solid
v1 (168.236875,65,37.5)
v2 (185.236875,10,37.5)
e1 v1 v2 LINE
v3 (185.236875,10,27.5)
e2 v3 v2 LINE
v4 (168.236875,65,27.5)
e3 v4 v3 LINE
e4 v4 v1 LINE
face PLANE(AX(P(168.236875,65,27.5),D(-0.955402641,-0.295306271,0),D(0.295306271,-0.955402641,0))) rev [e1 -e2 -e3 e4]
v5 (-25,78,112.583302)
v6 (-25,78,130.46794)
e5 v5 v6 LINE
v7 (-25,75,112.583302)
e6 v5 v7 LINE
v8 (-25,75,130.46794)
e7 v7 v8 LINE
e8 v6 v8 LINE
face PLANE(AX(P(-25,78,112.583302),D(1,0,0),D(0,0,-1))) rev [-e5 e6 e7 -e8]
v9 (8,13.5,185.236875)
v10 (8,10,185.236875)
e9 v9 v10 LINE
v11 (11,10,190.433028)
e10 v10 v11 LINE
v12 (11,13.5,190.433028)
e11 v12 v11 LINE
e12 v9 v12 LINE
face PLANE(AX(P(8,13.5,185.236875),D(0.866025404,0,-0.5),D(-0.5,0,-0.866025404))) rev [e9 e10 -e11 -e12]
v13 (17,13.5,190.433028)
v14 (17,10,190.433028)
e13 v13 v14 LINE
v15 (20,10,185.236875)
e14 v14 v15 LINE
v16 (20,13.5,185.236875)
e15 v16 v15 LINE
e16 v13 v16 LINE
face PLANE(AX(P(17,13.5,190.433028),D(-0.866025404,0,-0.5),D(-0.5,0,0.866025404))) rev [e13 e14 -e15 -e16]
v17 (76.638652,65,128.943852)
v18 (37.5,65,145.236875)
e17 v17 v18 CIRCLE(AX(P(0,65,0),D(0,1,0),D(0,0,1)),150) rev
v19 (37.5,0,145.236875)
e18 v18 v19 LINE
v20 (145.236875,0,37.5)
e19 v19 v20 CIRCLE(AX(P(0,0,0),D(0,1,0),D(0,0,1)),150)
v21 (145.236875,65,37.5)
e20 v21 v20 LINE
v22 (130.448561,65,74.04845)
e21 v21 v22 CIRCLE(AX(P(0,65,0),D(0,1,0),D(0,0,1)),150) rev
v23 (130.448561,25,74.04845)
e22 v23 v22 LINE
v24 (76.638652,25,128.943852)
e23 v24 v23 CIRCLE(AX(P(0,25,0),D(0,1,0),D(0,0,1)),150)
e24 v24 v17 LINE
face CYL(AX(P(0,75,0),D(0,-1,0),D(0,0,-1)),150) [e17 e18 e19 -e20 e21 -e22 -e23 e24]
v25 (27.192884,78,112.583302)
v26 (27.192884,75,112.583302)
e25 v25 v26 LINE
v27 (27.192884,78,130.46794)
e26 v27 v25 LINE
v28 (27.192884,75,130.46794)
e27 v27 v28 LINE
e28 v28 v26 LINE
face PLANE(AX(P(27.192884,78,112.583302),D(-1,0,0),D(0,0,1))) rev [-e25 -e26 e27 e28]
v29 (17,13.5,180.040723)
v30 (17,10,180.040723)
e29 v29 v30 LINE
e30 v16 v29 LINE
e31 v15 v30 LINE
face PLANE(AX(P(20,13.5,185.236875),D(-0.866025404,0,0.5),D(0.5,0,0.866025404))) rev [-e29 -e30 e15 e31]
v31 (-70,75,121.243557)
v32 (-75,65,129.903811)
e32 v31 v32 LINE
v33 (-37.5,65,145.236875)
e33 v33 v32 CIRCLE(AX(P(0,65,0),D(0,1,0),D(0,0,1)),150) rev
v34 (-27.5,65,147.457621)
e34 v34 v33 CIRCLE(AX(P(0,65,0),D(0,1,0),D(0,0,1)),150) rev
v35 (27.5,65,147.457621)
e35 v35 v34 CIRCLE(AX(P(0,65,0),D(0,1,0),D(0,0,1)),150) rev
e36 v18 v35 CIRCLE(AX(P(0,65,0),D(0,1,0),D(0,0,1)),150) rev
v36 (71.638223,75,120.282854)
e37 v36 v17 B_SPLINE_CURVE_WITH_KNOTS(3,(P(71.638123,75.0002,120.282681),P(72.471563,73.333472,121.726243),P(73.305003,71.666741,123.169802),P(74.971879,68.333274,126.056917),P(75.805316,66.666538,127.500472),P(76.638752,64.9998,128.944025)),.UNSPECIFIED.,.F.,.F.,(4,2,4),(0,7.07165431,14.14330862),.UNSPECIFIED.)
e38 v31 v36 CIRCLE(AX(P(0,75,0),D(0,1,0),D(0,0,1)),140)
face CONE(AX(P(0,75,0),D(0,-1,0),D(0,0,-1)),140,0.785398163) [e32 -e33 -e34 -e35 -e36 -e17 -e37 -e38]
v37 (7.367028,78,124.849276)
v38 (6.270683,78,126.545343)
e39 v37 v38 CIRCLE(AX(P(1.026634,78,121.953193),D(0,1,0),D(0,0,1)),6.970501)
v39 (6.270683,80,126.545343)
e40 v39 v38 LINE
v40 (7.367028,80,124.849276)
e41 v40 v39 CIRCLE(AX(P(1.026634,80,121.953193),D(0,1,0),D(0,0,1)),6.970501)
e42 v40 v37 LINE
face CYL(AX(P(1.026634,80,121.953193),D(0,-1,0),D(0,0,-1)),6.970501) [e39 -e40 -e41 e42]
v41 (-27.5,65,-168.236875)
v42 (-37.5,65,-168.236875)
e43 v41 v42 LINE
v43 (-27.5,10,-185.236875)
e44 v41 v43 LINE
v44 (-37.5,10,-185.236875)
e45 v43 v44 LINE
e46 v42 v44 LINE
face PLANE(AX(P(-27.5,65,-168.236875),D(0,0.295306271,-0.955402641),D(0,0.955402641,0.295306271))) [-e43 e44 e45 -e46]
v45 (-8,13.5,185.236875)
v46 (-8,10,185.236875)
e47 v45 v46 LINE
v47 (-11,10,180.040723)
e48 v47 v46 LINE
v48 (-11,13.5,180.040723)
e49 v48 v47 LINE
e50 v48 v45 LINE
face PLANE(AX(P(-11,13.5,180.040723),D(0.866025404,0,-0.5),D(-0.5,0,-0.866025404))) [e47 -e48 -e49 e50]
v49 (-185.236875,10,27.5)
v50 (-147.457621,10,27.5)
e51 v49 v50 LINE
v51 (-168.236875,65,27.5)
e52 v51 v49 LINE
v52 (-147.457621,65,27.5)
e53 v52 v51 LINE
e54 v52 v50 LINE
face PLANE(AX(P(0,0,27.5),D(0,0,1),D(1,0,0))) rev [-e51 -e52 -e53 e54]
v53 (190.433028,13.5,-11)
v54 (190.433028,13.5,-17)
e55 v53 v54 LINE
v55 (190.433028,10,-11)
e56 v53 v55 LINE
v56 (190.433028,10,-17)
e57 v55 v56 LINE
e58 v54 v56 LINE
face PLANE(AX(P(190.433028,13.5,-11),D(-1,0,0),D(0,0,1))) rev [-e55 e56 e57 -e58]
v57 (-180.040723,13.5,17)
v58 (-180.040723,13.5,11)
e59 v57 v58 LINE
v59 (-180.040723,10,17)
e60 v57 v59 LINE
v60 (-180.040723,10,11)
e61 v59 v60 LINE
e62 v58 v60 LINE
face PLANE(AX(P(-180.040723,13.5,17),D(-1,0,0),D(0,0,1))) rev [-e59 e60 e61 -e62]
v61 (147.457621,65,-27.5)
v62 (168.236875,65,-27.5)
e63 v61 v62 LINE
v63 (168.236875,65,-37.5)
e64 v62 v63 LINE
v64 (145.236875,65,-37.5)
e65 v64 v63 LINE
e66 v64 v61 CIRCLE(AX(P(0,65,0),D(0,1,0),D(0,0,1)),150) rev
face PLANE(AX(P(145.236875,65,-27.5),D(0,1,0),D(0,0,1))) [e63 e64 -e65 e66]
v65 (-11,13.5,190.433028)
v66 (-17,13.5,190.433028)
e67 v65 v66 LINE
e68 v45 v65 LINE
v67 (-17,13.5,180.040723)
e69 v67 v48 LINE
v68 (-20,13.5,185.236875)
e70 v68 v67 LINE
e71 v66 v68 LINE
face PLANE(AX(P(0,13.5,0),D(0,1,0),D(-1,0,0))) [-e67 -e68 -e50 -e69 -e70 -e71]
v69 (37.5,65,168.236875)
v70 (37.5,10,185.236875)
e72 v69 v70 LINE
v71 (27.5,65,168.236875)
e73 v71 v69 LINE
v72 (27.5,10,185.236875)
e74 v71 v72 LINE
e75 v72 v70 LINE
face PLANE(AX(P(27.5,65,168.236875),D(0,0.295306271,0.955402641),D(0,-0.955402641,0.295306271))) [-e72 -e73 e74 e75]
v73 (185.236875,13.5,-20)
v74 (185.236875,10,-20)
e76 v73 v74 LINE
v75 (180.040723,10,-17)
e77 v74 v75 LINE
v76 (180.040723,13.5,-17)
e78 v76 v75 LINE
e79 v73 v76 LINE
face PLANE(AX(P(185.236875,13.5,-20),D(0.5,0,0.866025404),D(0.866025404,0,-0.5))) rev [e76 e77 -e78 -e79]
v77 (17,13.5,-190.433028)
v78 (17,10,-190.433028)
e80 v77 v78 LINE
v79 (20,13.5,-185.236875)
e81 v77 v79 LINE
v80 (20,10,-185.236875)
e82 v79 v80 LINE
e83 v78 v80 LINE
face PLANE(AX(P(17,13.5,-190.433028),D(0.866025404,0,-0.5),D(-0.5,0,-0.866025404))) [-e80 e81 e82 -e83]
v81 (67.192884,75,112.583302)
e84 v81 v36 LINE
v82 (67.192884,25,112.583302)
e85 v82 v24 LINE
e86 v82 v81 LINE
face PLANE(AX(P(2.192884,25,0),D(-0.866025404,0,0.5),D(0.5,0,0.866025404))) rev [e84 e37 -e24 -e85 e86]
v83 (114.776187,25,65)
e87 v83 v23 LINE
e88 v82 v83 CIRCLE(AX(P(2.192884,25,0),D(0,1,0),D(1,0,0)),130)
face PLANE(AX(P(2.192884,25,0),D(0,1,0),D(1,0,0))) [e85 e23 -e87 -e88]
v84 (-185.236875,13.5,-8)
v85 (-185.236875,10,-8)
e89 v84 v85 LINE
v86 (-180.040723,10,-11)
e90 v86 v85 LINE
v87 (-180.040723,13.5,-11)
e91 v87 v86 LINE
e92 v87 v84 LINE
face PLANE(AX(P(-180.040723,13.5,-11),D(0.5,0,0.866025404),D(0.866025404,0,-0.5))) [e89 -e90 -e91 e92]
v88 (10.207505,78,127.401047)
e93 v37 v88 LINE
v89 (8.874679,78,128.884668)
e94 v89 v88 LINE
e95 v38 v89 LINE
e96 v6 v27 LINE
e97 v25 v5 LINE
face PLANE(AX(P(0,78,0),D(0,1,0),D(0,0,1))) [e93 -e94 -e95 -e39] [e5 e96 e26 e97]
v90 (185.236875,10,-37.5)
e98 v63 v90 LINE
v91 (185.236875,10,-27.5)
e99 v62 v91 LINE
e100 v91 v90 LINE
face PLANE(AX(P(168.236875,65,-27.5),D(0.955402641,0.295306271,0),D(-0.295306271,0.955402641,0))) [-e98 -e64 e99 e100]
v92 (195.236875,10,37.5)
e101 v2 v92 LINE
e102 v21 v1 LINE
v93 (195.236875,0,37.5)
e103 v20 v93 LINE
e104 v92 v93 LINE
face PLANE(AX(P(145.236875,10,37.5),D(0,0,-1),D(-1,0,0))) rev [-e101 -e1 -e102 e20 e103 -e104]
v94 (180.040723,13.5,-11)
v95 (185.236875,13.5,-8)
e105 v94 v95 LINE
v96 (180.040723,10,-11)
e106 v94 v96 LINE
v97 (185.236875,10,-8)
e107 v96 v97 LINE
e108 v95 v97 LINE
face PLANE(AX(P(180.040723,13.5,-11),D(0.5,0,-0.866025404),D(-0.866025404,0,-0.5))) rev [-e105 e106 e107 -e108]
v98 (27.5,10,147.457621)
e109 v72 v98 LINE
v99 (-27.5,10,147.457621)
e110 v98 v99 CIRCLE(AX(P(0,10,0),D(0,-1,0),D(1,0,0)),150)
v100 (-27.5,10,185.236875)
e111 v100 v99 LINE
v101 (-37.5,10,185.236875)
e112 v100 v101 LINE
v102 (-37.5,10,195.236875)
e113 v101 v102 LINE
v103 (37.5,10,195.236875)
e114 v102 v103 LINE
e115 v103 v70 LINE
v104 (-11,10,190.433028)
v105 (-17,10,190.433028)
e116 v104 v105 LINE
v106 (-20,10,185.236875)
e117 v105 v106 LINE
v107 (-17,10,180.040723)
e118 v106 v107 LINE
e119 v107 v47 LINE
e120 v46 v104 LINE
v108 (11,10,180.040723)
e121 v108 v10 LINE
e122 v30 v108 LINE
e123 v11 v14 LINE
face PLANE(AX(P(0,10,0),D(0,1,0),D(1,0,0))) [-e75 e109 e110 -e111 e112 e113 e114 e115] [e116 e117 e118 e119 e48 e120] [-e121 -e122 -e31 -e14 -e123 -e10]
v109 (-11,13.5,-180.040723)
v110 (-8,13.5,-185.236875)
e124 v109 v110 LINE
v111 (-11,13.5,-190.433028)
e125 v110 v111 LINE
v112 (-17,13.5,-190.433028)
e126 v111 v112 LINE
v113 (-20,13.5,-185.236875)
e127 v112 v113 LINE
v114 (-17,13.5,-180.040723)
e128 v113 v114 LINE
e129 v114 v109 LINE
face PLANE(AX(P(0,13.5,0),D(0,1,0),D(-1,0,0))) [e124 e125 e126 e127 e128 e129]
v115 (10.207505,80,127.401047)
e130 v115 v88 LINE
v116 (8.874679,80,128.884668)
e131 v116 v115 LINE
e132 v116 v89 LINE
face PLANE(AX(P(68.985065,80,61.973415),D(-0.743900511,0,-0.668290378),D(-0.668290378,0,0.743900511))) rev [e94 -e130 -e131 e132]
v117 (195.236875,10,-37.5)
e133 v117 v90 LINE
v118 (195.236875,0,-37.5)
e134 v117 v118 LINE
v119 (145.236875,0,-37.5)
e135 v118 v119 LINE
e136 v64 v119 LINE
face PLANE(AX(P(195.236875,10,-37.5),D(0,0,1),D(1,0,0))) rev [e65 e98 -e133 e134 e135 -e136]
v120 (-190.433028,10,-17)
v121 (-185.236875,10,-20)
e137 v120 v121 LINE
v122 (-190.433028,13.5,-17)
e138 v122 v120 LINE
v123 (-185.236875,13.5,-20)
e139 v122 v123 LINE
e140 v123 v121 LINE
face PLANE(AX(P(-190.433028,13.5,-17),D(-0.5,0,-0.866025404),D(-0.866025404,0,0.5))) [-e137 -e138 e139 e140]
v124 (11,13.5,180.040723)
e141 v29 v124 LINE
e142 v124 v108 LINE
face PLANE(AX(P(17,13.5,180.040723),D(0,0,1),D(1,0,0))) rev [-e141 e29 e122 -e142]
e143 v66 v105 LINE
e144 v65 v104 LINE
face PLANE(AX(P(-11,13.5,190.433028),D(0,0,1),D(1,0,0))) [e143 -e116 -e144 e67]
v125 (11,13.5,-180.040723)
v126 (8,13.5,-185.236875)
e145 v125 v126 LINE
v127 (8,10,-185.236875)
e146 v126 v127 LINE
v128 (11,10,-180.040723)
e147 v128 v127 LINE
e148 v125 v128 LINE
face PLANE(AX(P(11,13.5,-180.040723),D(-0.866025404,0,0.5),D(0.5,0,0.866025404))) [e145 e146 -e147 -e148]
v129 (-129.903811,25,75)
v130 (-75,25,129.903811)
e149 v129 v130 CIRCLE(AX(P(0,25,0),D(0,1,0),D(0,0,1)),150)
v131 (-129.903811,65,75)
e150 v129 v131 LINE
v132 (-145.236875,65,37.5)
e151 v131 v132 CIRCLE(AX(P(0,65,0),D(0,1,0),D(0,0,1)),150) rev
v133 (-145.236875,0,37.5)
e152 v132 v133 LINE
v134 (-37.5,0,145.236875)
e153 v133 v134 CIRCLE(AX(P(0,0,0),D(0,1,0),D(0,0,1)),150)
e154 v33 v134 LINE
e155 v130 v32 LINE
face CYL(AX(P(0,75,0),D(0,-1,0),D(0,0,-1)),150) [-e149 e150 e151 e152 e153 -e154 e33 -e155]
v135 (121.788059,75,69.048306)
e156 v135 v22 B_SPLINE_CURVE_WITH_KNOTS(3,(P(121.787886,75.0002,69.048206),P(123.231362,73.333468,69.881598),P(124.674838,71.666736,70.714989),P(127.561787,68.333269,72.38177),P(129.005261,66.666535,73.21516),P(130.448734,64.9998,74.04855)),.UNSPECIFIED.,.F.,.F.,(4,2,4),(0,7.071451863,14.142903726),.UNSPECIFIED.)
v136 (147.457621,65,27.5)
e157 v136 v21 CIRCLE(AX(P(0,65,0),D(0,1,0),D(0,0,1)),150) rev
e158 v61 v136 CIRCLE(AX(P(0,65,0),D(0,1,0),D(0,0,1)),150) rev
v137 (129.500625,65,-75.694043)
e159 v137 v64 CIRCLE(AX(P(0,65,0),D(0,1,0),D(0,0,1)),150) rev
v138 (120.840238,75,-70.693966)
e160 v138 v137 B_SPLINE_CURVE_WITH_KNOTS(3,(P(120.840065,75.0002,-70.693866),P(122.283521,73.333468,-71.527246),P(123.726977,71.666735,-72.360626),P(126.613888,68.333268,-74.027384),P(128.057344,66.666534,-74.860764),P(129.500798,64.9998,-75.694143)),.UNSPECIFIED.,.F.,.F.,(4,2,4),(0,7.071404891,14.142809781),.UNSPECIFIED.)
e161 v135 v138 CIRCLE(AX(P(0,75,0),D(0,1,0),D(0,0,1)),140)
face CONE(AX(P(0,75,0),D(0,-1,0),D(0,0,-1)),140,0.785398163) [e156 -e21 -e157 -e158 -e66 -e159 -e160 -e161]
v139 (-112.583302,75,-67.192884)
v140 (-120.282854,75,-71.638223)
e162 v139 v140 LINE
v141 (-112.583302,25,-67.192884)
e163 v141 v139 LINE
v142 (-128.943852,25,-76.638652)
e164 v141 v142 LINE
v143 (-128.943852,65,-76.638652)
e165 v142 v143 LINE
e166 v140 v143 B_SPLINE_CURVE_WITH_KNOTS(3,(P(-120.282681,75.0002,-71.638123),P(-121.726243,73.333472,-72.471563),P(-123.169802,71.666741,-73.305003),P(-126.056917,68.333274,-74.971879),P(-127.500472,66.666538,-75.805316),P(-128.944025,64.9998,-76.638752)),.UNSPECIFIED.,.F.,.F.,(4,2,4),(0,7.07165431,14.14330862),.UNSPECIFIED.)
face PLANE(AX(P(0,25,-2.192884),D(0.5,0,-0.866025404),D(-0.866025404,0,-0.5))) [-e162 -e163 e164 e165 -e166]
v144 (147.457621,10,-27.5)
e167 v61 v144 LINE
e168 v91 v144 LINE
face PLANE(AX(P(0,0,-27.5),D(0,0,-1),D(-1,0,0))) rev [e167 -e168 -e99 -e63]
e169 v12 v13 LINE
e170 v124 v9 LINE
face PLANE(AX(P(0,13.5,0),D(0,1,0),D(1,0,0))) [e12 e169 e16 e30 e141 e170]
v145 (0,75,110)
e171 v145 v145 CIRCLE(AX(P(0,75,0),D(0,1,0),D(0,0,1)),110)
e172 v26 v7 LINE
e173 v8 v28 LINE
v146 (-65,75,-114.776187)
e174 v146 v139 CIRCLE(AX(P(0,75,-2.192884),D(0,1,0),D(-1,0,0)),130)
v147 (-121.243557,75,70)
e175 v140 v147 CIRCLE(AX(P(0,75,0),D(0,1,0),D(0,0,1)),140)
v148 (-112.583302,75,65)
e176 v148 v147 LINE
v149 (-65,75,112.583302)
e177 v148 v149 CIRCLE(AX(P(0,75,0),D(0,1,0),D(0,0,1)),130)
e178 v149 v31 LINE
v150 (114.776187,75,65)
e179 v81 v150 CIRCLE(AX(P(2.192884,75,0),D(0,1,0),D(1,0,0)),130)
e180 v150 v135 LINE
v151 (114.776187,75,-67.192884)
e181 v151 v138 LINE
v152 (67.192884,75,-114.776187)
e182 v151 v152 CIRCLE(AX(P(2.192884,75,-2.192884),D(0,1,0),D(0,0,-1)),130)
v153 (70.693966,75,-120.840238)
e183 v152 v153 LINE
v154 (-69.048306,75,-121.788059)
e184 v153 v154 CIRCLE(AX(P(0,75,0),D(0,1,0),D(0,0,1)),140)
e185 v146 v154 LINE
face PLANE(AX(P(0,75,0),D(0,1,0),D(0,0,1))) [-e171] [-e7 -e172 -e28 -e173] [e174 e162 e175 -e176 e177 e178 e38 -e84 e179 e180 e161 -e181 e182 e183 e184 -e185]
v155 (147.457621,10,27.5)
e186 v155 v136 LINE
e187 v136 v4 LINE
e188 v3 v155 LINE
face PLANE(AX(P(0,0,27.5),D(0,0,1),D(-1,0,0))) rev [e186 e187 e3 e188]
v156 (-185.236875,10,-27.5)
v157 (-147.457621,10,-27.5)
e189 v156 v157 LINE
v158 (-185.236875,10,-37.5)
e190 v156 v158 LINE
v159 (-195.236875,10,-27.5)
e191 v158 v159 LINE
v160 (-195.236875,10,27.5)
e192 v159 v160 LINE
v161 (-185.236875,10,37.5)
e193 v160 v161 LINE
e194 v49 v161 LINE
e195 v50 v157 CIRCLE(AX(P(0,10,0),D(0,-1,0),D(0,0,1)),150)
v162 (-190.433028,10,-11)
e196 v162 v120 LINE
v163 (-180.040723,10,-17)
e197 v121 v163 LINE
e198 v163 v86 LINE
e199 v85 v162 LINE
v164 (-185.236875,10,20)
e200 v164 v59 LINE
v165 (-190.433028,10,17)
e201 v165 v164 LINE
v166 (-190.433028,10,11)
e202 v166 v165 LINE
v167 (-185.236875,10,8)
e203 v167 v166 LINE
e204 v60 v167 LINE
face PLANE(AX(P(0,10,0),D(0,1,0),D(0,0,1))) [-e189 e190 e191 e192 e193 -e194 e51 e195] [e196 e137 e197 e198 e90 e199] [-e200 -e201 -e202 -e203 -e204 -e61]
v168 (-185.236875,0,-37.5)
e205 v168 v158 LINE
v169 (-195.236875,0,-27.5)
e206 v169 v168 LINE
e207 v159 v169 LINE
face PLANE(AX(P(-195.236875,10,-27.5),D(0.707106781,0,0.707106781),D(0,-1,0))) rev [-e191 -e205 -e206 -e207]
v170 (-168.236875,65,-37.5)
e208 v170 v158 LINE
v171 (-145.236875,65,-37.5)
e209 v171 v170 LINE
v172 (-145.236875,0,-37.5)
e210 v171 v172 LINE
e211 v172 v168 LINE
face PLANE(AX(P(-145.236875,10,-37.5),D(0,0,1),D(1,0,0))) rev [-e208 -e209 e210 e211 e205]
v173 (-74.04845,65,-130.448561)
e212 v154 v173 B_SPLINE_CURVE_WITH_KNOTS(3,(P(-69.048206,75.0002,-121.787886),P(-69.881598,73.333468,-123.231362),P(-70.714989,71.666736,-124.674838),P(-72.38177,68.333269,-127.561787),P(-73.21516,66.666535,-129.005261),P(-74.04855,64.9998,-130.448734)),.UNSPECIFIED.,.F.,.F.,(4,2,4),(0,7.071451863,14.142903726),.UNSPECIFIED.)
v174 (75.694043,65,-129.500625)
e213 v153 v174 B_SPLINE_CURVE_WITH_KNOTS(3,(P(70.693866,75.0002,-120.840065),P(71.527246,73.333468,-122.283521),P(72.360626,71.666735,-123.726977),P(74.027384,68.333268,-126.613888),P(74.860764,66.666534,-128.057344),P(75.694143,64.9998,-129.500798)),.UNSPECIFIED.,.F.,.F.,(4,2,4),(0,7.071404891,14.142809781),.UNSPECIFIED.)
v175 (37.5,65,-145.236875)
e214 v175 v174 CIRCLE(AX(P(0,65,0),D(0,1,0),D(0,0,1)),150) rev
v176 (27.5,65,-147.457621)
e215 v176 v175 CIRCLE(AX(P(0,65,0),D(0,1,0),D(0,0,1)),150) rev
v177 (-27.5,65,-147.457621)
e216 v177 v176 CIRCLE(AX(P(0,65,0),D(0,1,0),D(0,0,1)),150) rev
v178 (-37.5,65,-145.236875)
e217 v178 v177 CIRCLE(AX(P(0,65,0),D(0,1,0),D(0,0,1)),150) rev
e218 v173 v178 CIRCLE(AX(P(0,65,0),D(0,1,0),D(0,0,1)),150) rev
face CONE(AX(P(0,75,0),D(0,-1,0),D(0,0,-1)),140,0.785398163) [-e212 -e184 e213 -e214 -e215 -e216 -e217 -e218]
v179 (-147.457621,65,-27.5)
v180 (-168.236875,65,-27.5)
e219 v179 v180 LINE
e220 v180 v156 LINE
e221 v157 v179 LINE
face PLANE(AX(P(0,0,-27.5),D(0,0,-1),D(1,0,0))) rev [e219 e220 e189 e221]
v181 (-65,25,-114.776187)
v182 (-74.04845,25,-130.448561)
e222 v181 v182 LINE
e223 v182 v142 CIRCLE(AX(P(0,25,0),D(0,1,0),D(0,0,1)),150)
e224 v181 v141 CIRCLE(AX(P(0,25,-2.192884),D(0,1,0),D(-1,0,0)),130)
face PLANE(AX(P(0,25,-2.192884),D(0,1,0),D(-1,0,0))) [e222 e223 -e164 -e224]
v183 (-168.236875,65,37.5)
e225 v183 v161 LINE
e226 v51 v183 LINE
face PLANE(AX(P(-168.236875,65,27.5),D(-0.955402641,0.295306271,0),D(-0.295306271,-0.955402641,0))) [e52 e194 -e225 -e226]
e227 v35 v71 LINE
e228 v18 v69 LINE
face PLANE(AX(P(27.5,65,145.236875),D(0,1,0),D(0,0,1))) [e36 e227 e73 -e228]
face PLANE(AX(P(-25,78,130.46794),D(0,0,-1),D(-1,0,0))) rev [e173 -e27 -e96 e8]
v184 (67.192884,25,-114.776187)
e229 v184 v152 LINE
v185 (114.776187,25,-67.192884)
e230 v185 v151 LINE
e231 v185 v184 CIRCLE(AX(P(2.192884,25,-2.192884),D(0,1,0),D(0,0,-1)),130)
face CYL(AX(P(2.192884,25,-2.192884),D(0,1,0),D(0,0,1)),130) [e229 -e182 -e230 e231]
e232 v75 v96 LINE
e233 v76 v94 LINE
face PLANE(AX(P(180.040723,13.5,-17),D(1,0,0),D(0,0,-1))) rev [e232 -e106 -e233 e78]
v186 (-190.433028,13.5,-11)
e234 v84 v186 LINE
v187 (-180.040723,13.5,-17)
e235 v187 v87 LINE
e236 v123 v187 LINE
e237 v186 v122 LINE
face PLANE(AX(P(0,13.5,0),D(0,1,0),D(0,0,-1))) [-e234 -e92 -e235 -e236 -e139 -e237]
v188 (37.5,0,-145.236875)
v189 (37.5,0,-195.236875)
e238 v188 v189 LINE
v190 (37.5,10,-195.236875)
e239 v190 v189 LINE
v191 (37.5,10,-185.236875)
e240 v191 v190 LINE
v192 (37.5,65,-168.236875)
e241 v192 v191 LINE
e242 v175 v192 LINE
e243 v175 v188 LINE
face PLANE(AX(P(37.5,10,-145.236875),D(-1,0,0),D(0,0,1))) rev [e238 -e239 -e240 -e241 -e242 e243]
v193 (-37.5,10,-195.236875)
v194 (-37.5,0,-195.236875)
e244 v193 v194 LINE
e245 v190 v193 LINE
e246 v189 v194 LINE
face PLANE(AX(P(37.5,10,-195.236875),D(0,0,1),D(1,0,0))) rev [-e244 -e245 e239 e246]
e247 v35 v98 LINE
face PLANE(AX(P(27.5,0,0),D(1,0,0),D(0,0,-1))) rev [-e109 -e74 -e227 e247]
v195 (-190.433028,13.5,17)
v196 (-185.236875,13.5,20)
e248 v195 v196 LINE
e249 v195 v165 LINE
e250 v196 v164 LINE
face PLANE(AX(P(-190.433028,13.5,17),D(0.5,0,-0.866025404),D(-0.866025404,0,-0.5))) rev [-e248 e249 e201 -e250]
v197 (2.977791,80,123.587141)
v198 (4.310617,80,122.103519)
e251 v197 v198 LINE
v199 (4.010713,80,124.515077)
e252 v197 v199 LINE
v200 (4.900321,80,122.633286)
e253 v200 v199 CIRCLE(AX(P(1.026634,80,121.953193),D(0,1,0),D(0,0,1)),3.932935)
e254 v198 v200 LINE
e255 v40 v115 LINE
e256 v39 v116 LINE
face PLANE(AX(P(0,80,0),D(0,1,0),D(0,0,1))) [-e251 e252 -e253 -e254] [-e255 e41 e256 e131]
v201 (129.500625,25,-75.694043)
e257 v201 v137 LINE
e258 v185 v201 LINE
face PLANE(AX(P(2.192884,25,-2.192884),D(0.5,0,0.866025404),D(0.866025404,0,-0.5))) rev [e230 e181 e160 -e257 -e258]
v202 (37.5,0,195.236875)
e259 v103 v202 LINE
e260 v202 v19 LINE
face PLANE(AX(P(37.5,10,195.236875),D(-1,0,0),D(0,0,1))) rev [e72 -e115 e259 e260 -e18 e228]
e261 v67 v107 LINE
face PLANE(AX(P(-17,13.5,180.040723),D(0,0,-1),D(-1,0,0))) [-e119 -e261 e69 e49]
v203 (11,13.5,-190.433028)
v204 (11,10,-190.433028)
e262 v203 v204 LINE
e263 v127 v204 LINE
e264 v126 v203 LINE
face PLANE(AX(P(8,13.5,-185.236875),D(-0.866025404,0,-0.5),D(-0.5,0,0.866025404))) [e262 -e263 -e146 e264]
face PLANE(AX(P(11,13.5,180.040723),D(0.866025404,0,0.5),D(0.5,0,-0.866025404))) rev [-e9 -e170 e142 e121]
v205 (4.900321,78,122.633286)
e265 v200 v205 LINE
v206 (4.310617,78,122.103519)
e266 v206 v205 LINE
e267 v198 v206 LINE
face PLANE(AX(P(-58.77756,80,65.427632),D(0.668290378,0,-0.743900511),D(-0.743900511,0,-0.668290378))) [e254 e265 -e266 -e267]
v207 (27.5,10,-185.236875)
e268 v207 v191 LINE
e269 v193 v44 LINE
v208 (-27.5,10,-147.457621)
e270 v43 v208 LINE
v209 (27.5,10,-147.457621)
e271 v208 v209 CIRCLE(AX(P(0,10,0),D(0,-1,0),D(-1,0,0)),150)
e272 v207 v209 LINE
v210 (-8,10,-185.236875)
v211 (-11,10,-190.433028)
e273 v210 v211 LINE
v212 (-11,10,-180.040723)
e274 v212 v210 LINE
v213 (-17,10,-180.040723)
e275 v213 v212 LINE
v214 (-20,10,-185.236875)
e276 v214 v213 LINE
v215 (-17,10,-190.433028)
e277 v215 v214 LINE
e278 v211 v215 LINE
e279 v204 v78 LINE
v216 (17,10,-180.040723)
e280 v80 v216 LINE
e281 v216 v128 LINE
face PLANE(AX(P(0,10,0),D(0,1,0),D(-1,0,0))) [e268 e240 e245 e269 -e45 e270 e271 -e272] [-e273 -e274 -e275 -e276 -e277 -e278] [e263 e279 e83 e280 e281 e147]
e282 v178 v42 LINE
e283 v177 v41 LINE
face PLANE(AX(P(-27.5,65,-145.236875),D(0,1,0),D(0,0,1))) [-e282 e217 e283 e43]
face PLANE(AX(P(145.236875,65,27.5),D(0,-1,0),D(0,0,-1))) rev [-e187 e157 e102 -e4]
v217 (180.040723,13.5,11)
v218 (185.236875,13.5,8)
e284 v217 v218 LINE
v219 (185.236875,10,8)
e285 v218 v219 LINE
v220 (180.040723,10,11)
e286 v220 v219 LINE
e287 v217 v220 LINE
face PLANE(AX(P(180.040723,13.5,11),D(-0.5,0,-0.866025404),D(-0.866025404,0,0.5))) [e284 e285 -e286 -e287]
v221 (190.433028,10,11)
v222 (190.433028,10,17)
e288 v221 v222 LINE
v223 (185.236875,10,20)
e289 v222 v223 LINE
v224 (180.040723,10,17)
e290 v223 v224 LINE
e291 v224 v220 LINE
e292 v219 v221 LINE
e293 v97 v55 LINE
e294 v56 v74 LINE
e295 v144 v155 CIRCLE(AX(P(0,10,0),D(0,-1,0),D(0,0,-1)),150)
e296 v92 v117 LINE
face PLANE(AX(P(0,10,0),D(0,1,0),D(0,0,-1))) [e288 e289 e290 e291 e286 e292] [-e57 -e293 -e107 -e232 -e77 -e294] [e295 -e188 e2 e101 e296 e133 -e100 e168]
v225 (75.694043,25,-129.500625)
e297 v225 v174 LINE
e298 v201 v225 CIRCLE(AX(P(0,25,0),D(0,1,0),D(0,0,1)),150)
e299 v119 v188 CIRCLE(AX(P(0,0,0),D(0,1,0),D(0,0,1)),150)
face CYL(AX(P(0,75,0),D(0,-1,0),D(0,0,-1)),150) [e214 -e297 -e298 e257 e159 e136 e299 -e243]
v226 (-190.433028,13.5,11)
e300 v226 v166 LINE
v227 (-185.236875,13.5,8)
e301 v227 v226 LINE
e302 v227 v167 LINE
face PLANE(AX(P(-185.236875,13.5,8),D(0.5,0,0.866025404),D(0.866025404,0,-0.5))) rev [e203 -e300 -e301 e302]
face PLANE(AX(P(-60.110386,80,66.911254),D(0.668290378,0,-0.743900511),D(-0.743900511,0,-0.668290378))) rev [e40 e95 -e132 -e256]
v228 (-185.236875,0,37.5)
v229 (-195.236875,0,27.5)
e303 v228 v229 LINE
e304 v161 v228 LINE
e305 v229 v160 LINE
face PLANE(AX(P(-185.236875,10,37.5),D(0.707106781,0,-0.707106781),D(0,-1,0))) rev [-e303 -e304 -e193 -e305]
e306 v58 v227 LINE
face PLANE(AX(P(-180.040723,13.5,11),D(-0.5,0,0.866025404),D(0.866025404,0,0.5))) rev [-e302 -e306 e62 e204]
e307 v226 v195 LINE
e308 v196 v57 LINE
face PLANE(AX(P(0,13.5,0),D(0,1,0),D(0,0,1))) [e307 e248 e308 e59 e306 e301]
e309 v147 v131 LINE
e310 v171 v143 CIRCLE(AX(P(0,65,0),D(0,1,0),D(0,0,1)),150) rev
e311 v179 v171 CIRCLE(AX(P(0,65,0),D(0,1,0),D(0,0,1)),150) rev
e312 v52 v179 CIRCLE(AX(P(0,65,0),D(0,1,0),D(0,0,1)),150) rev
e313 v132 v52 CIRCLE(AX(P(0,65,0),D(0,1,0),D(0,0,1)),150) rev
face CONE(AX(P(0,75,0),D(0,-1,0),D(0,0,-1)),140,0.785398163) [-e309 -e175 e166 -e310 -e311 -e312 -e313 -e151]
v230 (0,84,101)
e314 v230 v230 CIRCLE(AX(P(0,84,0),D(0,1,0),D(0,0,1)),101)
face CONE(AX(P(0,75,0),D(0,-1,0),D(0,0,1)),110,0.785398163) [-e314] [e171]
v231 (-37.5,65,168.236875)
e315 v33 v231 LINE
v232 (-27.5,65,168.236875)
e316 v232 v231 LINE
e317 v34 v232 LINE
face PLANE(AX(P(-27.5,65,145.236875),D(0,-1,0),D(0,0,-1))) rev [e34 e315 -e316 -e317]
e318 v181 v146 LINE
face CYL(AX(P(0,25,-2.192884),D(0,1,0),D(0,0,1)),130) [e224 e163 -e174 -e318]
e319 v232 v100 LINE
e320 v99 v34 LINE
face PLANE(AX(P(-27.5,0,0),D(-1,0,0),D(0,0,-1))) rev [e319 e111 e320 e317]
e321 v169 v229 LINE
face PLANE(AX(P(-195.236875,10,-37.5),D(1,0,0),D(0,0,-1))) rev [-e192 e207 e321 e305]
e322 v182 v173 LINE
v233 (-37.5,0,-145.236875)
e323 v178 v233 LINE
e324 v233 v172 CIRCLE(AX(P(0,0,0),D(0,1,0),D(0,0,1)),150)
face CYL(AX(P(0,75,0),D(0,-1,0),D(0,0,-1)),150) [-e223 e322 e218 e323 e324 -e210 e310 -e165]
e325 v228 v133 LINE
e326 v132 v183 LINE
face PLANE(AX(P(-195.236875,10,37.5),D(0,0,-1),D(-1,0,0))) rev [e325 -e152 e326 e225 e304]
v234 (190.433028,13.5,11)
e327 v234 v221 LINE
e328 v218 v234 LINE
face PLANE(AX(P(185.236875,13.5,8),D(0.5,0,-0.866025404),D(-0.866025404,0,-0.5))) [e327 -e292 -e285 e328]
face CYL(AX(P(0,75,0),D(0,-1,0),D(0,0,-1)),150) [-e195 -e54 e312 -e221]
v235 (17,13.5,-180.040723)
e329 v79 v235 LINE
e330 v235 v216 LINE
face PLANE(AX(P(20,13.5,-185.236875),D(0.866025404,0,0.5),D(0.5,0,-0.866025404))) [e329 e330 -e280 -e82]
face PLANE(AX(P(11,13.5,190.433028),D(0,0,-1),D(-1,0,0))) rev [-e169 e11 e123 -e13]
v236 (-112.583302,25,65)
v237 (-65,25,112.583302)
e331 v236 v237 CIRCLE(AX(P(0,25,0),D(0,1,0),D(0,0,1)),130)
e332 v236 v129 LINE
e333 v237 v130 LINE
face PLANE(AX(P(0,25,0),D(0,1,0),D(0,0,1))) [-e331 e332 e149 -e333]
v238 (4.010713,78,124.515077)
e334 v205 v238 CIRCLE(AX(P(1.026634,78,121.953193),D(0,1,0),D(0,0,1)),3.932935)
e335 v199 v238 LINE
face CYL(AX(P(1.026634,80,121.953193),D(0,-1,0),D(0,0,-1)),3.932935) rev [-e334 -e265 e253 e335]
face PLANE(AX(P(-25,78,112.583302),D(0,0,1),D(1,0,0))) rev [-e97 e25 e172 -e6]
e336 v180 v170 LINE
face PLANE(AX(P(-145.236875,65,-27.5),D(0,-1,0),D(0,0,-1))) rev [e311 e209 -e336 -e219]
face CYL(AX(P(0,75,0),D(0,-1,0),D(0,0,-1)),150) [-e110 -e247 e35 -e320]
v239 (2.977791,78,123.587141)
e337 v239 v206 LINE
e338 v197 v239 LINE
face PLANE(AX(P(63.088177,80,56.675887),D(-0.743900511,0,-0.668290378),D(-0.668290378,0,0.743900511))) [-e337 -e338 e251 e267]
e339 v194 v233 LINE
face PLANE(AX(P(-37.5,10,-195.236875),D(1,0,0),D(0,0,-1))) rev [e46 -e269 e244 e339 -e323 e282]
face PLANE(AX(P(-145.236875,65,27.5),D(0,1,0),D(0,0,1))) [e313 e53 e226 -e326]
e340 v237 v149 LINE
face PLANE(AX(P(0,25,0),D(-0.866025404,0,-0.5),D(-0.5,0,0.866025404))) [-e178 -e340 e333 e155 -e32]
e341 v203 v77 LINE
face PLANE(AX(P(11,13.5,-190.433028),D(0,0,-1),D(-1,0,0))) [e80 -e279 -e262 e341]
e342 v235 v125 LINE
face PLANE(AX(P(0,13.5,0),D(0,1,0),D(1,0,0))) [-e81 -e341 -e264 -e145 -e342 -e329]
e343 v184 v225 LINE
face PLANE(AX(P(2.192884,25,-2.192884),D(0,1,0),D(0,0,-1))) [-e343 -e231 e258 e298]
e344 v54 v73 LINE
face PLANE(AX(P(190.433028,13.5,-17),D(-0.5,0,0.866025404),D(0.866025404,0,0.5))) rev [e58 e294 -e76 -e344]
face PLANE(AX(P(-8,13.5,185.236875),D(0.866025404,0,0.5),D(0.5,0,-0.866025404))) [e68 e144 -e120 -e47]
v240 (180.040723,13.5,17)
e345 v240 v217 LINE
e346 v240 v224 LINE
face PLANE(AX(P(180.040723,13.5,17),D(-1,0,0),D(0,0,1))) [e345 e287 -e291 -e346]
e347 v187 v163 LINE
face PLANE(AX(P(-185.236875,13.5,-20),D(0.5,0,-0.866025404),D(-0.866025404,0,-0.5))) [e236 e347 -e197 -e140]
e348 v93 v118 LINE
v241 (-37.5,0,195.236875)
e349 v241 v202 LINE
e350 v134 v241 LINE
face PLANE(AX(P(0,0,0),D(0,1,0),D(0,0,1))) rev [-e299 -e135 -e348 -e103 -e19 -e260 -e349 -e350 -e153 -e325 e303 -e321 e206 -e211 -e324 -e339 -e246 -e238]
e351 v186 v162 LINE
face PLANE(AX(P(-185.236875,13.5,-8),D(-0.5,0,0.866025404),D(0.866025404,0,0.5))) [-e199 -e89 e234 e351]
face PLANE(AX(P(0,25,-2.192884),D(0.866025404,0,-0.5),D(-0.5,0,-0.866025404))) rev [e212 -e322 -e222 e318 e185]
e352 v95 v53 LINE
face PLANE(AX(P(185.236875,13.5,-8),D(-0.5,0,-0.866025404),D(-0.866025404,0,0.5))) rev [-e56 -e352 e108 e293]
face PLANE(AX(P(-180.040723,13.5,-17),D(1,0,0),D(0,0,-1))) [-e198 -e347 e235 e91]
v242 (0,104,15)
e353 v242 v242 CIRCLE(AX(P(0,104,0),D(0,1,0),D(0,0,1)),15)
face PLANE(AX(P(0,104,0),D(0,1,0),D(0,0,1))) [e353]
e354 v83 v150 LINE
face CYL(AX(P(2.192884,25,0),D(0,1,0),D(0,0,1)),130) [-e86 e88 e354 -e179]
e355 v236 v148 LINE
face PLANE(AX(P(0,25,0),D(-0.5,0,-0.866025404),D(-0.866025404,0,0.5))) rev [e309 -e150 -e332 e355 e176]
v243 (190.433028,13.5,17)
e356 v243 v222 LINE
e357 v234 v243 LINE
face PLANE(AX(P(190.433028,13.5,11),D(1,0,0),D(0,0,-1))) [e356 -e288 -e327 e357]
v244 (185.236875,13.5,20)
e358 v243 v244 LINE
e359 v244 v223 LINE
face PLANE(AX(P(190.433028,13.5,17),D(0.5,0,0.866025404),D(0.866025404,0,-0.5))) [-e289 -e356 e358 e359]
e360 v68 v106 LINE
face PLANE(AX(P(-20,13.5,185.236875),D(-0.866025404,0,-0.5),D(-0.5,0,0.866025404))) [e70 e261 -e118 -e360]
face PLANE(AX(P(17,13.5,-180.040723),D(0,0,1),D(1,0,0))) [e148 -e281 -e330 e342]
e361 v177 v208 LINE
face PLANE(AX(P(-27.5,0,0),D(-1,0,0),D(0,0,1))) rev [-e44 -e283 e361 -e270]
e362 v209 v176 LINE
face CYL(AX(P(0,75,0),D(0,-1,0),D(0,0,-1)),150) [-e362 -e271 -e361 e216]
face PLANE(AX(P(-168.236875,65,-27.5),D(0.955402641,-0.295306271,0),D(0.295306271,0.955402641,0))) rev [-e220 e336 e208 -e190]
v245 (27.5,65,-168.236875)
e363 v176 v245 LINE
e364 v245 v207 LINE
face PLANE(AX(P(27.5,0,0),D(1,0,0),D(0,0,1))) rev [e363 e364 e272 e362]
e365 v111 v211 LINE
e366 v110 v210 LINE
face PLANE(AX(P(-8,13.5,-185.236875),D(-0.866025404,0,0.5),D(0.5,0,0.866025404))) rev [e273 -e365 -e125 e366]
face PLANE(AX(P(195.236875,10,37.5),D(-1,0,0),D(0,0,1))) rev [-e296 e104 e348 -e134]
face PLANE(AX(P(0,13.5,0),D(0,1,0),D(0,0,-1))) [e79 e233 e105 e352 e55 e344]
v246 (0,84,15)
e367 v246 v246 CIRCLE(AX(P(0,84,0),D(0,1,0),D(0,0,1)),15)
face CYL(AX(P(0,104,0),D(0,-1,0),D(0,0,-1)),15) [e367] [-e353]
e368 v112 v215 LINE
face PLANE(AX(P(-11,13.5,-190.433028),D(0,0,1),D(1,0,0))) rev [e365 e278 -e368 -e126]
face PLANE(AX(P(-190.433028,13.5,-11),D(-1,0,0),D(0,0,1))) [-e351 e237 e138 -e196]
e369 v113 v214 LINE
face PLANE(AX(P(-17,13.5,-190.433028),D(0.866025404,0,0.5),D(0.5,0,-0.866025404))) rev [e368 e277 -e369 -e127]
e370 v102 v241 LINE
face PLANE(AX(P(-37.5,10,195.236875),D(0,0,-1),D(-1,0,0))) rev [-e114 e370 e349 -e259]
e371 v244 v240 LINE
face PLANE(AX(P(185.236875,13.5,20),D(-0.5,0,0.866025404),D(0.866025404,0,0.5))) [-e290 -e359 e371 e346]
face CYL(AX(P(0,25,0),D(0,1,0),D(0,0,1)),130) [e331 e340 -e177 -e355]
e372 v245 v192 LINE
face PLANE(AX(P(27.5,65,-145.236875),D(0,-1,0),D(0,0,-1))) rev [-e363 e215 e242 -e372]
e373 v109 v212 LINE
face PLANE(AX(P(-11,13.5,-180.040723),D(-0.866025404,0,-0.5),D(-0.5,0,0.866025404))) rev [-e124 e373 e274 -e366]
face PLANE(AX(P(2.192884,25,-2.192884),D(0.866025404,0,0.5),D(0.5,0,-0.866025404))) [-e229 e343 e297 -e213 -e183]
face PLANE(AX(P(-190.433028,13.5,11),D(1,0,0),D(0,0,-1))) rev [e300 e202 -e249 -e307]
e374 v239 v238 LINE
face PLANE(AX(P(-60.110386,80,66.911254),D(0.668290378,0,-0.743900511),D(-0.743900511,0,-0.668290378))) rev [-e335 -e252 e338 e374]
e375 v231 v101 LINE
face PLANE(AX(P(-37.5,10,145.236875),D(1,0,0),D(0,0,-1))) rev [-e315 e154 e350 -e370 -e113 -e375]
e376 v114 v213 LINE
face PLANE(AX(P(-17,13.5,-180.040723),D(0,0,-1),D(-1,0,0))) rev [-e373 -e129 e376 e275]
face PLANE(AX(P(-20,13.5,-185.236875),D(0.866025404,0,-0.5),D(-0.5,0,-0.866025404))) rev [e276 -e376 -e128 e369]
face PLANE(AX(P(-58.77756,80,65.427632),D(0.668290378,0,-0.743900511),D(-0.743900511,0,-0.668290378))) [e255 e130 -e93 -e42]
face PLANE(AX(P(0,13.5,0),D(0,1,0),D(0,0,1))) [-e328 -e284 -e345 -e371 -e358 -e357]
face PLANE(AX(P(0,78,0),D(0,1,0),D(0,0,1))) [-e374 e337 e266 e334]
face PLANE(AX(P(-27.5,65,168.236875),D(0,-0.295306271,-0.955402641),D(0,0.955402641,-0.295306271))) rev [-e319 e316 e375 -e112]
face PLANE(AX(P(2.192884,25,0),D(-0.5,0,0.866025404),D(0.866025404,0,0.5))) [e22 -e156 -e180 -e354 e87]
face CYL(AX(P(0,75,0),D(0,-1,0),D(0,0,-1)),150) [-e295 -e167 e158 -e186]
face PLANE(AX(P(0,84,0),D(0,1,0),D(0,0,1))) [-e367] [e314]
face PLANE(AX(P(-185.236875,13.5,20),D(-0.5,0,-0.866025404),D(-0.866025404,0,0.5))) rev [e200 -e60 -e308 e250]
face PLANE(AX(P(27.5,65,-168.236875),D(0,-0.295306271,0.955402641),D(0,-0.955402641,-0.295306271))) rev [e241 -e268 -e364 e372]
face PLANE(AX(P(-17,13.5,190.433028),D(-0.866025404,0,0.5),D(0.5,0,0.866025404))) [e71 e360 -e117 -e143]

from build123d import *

# Parameters (mm, degrees)
SKETCH1_R                = 150
BOSS_EXTRUDE1_DEPTH      = 75
CHAMFER1_SIZE            = 10
BOSS_EXTRUDE2_START      = -75
BOSS_EXTRUDE2_DEPTH      = 10
CHAMFER2_SIZE            = 10
BOSS_EXTRUDE3_DEPTH      = 10
BOSS_EXTRUDE4_DEPTH      = 3.5
CIRPATTERN1_COUNT        = 4
CIRPATTERN1_COPY_1_DEPTH = 10
CIRPATTERN1_COPY_2_DEPTH = 10
CIRPATTERN1_COPY_3_DEPTH = 10
CIRPATTERN1_COPY_4_DEPTH = 3.5
CIRPATTERN1_COPY_5_DEPTH = 3.5
CIRPATTERN1_COPY_6_DEPTH = 3.5
CUT_EXTRUDE1_START       = -50
CUT_EXTRUDE1_DEPTH       = 50
CIRPATTERN2_COUNT        = 4
SKETCH7_R                = 110
BOSS_EXTRUDE5_DEPTH      = 9
BOSS_EXTRUDE5_TAPER      = 45
SKETCH8_R                = 15
BOSS_EXTRUDE6_DEPTH      = 20
SKETCH9_W                = 52.192884268
SKETCH9_H                = 17.88463766
BOSS_EXTRUDE7_DEPTH      = 3
BOSS_EXTRUDE8_DEPTH      = 2


# Read off the part's stored shape, not the designer's step: Cut-Extrude1
with BuildPart() as part:
    # Sketch1 → Boss-Extrude1 (new body)
    with BuildSketch(Plane(origin=(0, 0, 0), x_dir=(1, 0, 0), z_dir=(0, 1, 0))):
        with Locations(Location((0, 0, 0), (0, 0, 270))):
            Circle(SKETCH1_R)
    extrude(amount=BOSS_EXTRUDE1_DEPTH)

    # Chamfer1
    chamfer1_edges = [part.edges().sort_by_distance(p)[0] for p in [
        (0, 75, -150),
    ]]
    chamfer(chamfer1_edges, length=CHAMFER1_SIZE)

    # Sketch3 → Boss-Extrude2 (add)
    with BuildSketch(Plane(origin=(0, 75, 0), x_dir=(1, 0, 0), z_dir=(0, 1, 0)).offset(BOSS_EXTRUDE2_START)):
        with BuildLine():
            Line((-145.236875483, 37.5), (-195.236875483, 37.5))
            Line((-195.236875483, 37.5), (-195.236875483, -37.5))
            Line((-195.236875483, -37.5), (-145.236875483, -37.5))
            ThreePointArc((-145.236875483, -37.5), (-150, 0), (-145.236875483, 37.5))
        make_face()
    boss_extrude2 = extrude(amount=BOSS_EXTRUDE2_DEPTH)

    # Chamfer2
    chamfer2_edges = [part.edges().sort_by_distance(p)[0] for p in [
        (-195.236875483, 5, -37.5),
        (-195.236875483, 5, 37.5),
    ]]
    chamfer(chamfer2_edges, length=CHAMFER2_SIZE)

    # Sketch4 → Boss-Extrude3 (add)
    with BuildSketch(Plane.XY.offset(37.5)):
        Polygon((-185.236875483, 10), (-145.236875483, 10), (-145.236875483, 65), (-168.236875483, 65), align=None)
    boss_extrude3 = extrude(amount=-BOSS_EXTRUDE3_DEPTH)

    # Sketch5 → Boss-Extrude4 (add)
    with BuildSketch(Plane(origin=(0, 10, 0), x_dir=(1, 0, 0), z_dir=(0, 1, 0))):
        Polygon((-185.236875483, -20), (-180.04072306, -17), (-180.04072306, -11), (-185.236875483, -8), (-190.433027905, -11), (-190.433027905, -17), align=None)
    boss_extrude4 = extrude(amount=BOSS_EXTRUDE4_DEPTH)

    # Mirror1: Boss-Extrude3, Boss-Extrude4 across plane
    add(boss_extrude3.mirror(Plane.XY))
    add(boss_extrude4.mirror(Plane.XY))

    # CirPattern1: Boss-Extrude2, Boss-Extrude3, Boss-Extrude4 ×4 about axis
    cirpattern1_axis = Axis((0, 0, 0), (0, 1, 0))
    add([boss_extrude2.rotate(cirpattern1_axis, i * 360 / CIRPATTERN1_COUNT) for i in range(1, CIRPATTERN1_COUNT)])
    add([boss_extrude3.rotate(cirpattern1_axis, i * 360 / CIRPATTERN1_COUNT) for i in range(1, CIRPATTERN1_COUNT)])
    add([boss_extrude4.rotate(cirpattern1_axis, i * 360 / CIRPATTERN1_COUNT) for i in range(1, CIRPATTERN1_COUNT)])

    # CirPattern1 copy 1 sketch → CirPattern1 copy 1 (add)
    with BuildSketch(Plane(origin=(-37.5, 0, 0), x_dir=(0, 0, -1), z_dir=(-1, 0, 0))):
        Polygon((-185.236875483, -10), (-145.236875483, -10), (-145.236875483, -65), (-168.236875483, -65), align=None)
    extrude(amount=-CIRPATTERN1_COPY_1_DEPTH)

    # CirPattern1 copy 2 sketch → CirPattern1 copy 2 (add)
    with BuildSketch(Plane(origin=(0, 0, 37.5), x_dir=(-1, 0, 0), z_dir=(0, 0, 1))):
        Polygon((-185.236875483, -10), (-145.236875483, -10), (-145.236875483, -65), (-168.236875483, -65), align=None)
    extrude(amount=-CIRPATTERN1_COPY_2_DEPTH)

    # CirPattern1 copy 3 sketch → CirPattern1 copy 3 (add)
    with BuildSketch(Plane(origin=(37.5, 0, 0), x_dir=(0, 0, 1), z_dir=(1, 0, 0))):
        Polygon((-185.236875483, -10), (-145.236875483, -10), (-145.236875483, -65), (-168.236875483, -65), align=None)
    extrude(amount=-CIRPATTERN1_COPY_3_DEPTH)

    # CirPattern1 copy 4 sketch → CirPattern1 copy 4 (add)
    with BuildSketch(Plane(origin=(0, 10, 0), x_dir=(0, 0, -1), z_dir=(0, 1, 0))):
        Polygon((-185.236875483, 20), (-180.04072306, 17), (-180.04072306, 11), (-185.236875483, 8), (-190.433027905, 11), (-190.433027905, 17), align=None)
    extrude(amount=CIRPATTERN1_COPY_4_DEPTH)

    # CirPattern1 copy 5 sketch → CirPattern1 copy 5 (add)
    with BuildSketch(Plane(origin=(0, 10, 0), x_dir=(-1, 0, 0), z_dir=(0, 1, 0))):
        Polygon((-185.236875483, 20), (-180.04072306, 17), (-180.04072306, 11), (-185.236875483, 8), (-190.433027905, 11), (-190.433027905, 17), align=None)
    extrude(amount=CIRPATTERN1_COPY_5_DEPTH)

    # CirPattern1 copy 6 sketch → CirPattern1 copy 6 (add)
    with BuildSketch(Plane.ZX.offset(10)):
        Polygon((-185.236875483, 20), (-180.04072306, 17), (-180.04072306, 11), (-185.236875483, 8), (-190.433027905, 11), (-190.433027905, 17), align=None)
    extrude(amount=CIRPATTERN1_COPY_6_DEPTH)

    # Cut-Extrude1 outline → Cut-Extrude1 (cut)
    with BuildSketch(Plane(origin=(0, 75, 0), x_dir=(1, 0, 0), z_dir=(0, 1, 0)).offset(CUT_EXTRUDE1_START)):
        with BuildLine():
            ThreePointArc((-65, -112.583302492), (-91.923881554, -91.923881554), (-112.583302492, -65))
            Line((-112.583302492, -65), (-129.903810568, -75))
            ThreePointArc((-129.903810568, -75), (-106.066017178, -106.066017178), (-75, -129.903810568))
            Line((-75, -129.903810568), (-65, -112.583302492))
        make_face()
    cut_extrude1 = extrude(amount=CUT_EXTRUDE1_DEPTH, mode=Mode.SUBTRACT)

    # CirPattern2: Cut-Extrude1 ×4 about axis
    cirpattern2_axis = Axis((1.096442134, 0, -1.096442134), (0, 1, 0))
    for i in range(1, CIRPATTERN2_COUNT):
        add(cut_extrude1.rotate(cirpattern2_axis, i * 360 / CIRPATTERN2_COUNT), mode=Mode.SUBTRACT)

    # Sketch7 → Boss-Extrude5 (add)
    with BuildSketch(Plane(origin=(0, 75, 0), x_dir=(1, 0, 0), z_dir=(0, 1, 0))):
        Circle(SKETCH7_R)
    extrude(amount=BOSS_EXTRUDE5_DEPTH, taper=BOSS_EXTRUDE5_TAPER)

    # Sketch8 → Boss-Extrude6 (add)
    with BuildSketch(Plane(origin=(0, 84, 0), x_dir=(1, 0, 0), z_dir=(0, 1, 0))):
        with Locations(Location((0, 0, 0), (0, 0, 270))):
            Circle(SKETCH8_R)
    extrude(amount=BOSS_EXTRUDE6_DEPTH)

    # Sketch9 → Boss-Extrude7 (add)
    with BuildSketch(Plane(origin=(0, 75, 0), x_dir=(1, 0, 0), z_dir=(0, 1, 0))):
        with Locations((1.096442134, -121.525621322)):
            Rectangle(SKETCH9_W, SKETCH9_H)
    extrude(amount=BOSS_EXTRUDE7_DEPTH)

    # Sketch10 → Boss-Extrude8 (add)
    with BuildSketch(Plane(origin=(0, 78, 0), x_dir=(1, 0, 0), z_dir=(0, 1, 0))):
        with BuildLine():
            Line((6.270682812, -126.545342988), (8.874678556, -128.884668308))
            Line((8.874678556, -128.884668308), (10.207504523, -127.401046891))
            Line((10.207504523, -127.401046891), (7.367027593, -124.84927636))
            ThreePointArc((7.367027593, -124.84927636), (-4.827336948, -118.169160855), (6.270682812, -126.545342988))
        make_face()
        with BuildLine():
            Line((4.310616526, -122.103519263), (2.977790559, -123.58714068))
            Line((2.977790559, -123.58714068), (4.010713475, -124.515077192))
            ThreePointArc((4.010713475, -124.515077192), (-2.528998008, -120.272284372), (4.900321371, -122.63328644))
            Line((4.900321371, -122.63328644), (4.310616526, -122.103519263))
        make_face(mode=Mode.SUBTRACT)
    extrude(amount=BOSS_EXTRUDE8_DEPTH)


solid = part.part
